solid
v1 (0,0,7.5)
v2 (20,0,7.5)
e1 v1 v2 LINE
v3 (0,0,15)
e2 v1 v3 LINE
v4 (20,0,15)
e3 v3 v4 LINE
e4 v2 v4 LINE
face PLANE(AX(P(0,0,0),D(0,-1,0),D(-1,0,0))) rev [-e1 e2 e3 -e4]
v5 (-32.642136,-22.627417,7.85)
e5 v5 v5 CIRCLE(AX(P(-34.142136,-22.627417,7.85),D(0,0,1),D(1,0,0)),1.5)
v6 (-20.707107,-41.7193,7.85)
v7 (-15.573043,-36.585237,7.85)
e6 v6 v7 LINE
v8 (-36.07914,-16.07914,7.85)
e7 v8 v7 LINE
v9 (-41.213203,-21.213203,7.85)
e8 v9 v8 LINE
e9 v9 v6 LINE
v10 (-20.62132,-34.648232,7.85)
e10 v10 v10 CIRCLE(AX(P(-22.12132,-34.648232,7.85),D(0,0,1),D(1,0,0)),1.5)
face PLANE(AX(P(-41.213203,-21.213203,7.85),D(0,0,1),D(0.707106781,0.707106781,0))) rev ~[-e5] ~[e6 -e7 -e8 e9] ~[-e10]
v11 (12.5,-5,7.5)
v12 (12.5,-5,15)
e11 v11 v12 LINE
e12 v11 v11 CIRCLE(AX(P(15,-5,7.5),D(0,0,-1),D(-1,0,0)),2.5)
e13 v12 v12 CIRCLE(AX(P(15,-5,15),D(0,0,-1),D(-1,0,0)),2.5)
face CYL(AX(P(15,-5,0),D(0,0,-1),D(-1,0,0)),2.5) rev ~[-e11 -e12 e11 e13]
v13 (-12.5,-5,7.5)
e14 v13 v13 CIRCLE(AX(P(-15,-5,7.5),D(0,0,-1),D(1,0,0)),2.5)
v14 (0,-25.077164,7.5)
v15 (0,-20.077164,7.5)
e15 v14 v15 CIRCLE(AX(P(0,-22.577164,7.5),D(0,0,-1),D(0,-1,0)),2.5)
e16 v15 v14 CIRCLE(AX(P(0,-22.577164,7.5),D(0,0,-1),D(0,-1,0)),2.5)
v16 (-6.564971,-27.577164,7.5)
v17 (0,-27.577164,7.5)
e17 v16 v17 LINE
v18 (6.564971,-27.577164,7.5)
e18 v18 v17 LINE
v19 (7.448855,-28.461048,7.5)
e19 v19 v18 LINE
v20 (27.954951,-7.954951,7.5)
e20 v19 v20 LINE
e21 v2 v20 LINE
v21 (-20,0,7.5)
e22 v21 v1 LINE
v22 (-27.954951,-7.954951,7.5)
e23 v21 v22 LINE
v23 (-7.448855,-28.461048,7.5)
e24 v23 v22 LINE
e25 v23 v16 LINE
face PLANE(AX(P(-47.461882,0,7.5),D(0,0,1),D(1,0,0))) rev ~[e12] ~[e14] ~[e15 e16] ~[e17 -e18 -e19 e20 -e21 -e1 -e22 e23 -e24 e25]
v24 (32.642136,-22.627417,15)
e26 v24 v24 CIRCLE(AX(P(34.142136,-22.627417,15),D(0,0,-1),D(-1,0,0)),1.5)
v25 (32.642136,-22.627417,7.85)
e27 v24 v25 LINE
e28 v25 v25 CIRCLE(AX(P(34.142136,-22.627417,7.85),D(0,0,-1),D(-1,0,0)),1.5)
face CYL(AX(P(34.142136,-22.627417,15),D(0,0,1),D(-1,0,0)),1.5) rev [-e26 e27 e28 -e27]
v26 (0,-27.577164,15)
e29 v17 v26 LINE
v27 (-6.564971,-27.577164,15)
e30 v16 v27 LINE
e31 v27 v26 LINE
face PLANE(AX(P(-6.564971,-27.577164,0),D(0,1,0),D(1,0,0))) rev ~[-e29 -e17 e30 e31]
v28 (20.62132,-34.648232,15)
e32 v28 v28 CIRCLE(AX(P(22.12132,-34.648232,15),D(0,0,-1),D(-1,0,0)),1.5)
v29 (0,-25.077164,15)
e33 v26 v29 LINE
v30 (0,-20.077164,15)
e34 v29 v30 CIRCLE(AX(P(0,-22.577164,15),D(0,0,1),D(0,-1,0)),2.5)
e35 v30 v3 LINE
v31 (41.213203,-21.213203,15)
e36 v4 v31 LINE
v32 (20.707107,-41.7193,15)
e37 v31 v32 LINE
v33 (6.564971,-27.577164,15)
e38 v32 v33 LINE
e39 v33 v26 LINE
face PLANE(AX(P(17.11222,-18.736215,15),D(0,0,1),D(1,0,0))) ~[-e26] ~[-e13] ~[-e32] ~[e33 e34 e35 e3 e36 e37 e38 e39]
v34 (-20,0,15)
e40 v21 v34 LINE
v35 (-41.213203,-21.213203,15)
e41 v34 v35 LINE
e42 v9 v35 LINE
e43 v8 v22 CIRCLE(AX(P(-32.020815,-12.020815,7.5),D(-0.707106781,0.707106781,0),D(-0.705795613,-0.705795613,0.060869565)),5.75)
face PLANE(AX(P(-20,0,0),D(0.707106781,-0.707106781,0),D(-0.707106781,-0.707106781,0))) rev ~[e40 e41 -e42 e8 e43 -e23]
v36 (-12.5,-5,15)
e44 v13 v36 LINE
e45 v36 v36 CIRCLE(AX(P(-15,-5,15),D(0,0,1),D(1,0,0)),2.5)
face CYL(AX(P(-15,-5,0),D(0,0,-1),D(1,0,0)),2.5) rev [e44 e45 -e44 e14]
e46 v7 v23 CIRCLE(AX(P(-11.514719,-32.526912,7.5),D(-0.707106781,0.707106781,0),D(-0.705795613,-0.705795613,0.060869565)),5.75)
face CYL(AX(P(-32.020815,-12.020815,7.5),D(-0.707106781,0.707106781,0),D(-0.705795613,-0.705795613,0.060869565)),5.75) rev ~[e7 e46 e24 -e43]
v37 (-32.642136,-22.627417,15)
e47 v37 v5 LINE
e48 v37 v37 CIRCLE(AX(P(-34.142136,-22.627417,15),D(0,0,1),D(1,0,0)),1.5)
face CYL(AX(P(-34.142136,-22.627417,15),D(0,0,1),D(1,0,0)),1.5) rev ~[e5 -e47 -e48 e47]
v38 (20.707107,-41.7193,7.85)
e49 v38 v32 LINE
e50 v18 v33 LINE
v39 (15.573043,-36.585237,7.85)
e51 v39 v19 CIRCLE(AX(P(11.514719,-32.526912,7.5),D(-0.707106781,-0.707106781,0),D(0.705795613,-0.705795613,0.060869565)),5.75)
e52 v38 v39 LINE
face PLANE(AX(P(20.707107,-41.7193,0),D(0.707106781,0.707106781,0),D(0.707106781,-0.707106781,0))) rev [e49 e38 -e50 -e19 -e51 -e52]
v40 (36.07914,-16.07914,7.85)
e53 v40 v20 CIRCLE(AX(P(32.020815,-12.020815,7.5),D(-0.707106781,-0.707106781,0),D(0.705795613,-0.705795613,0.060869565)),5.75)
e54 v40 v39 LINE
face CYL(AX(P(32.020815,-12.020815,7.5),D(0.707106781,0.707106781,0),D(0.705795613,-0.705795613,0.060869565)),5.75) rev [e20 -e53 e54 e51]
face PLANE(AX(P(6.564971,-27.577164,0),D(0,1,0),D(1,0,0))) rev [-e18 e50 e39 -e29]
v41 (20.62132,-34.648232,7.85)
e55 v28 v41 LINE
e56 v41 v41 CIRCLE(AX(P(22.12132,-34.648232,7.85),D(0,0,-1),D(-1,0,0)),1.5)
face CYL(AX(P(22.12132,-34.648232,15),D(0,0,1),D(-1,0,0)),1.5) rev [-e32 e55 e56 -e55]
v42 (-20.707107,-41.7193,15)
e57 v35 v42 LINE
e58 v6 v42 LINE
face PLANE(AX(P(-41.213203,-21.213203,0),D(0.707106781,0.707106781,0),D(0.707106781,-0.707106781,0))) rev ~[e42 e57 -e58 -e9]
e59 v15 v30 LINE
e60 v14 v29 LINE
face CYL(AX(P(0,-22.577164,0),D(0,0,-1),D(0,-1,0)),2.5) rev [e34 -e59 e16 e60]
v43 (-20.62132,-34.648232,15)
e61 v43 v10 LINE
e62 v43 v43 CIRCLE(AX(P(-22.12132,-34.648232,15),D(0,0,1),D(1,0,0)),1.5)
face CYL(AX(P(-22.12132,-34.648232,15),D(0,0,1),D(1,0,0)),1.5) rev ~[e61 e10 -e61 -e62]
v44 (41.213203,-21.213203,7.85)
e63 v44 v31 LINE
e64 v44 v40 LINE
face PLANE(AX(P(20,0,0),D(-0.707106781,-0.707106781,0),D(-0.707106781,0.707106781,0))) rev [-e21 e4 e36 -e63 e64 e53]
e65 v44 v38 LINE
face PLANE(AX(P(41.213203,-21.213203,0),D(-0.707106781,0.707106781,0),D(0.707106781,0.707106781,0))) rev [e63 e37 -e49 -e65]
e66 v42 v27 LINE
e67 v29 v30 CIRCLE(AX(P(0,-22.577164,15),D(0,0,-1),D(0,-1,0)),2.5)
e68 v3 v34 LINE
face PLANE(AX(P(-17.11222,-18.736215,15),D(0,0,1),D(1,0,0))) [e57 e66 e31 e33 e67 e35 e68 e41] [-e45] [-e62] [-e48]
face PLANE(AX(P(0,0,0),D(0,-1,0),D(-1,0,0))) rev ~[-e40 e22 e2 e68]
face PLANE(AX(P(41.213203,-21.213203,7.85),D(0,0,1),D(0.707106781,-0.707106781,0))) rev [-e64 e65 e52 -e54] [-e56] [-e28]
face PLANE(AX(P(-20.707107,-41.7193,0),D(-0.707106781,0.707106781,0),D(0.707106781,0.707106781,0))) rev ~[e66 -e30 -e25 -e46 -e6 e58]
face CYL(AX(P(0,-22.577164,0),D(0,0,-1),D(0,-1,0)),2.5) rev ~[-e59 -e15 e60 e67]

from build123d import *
from build123d import SkipClean  # not in build123d's __all__

# Parameters (mm, degrees)
F0_R      = 2.5
F1_DEPTH  = 15
F3_DEPTH  = 29
F4_R      = 1.5
F5_DEPTH  = 7.15
F6_R      = 1
F7_DEPTH  = 7.15
F10_DEPTH = 55


with BuildPart() as f1:
    # F0 (on Top) → F1 (new body)
    with BuildSketch(Plane.XY):
        with BuildLine():
            Line((0, 0), (-20, 0))
            Line((-20, 0), (-41.2132034356, -21.2132034356))
            Line((-41.2132034356, -21.2132034356), (-20.7071067812, -41.71930009))
            Line((-20.7071067812, -41.71930009), (-6.5649711575, -27.5771644663))
            Line((-6.5649711575, -27.5771644663), (0, -27.5771644663))
            Line((0, -27.5771644663), (0, -25.0771644663))
            ThreePointArc((0, -25.0771644663), (-2.5, -22.5771644663), (0, -20.0771644663))
            Line((0, -20.0771644663), (0, 0))
        make_face()
        with Locations((-15, -5)):
            Circle(F0_R, mode=Mode.SUBTRACT)
    extrude(amount=F1_DEPTH)

    # F2 (on face) → F3 (cut, through all)
    with BuildSketch(Plane(origin=(-10, 10, 0), x_dir=(-0.7071067812, -0.7071067812, 0), z_dir=(-0.7071067812, 0.7071067812, 0))):
        with BuildLine():
            Line((44.1421356237, 7.85), (36.8814735646, 7.85))
            ThreePointArc((36.8814735646, 7.85), (25.3921356237, 7.5), (36.8814735646, 7.15))
            Line((36.8814735646, 7.15), (44.1421356237, 7.15))
            Line((44.1421356237, 7.15), (44.1421356237, 7.85))
        make_face()
    extrude(amount=-F3_DEPTH, mode=Mode.SUBTRACT)

    # F4 (on face) → F5 (cut, through all)
    with BuildSketch(Plane.XY.offset(15)):
        with Locations((-34.1421356237, -22.627416998)):
            Circle(F4_R)
        with Locations((-22.1213203436, -34.6482322781)):
            Circle(F4_R)
    extrude(amount=-F5_DEPTH, mode=Mode.SUBTRACT)

    # F6 (on face) → F7 (cut, through all)
    with BuildSketch(Plane(origin=(0, 0, 0), x_dir=(1, 0, 0), z_dir=(0, 0, -1))):
        with Locations((-22.1213203436, 34.6482322781)):
            Circle(F6_R)
        with Locations((-34.1421356237, 22.627416998)):
            Circle(F6_R)
    extrude(amount=-F7_DEPTH, mode=Mode.SUBTRACT)

    # F8: F1 across plane


with BuildPart() as f1_1:
    add(f1.part, clean=False)
    with SkipClean():  # cleaning this boolean's faces spoils the solid; the shape is the same uncleaned
        add(f1.part.mirror(Plane.YZ), clean=False)

    # F9 (on face) → F10 (cut)
    with BuildSketch(Plane(origin=(0, 0, 0), x_dir=(-1, 0, 0), z_dir=(0, 1, 0))):
        Polygon((47.4618822336, 7.5), (-20, 7.5), (-48.8657653332, 7.5), (-48.8657653332, -7.0414701477), (47.4618822336, -7.0414701477), align=None)
    with SkipClean():  # cleaning this boolean's faces spoils the solid; the shape is the same uncleaned
        extrude(amount=-F10_DEPTH, mode=Mode.SUBTRACT)


solid = f1_1.part
